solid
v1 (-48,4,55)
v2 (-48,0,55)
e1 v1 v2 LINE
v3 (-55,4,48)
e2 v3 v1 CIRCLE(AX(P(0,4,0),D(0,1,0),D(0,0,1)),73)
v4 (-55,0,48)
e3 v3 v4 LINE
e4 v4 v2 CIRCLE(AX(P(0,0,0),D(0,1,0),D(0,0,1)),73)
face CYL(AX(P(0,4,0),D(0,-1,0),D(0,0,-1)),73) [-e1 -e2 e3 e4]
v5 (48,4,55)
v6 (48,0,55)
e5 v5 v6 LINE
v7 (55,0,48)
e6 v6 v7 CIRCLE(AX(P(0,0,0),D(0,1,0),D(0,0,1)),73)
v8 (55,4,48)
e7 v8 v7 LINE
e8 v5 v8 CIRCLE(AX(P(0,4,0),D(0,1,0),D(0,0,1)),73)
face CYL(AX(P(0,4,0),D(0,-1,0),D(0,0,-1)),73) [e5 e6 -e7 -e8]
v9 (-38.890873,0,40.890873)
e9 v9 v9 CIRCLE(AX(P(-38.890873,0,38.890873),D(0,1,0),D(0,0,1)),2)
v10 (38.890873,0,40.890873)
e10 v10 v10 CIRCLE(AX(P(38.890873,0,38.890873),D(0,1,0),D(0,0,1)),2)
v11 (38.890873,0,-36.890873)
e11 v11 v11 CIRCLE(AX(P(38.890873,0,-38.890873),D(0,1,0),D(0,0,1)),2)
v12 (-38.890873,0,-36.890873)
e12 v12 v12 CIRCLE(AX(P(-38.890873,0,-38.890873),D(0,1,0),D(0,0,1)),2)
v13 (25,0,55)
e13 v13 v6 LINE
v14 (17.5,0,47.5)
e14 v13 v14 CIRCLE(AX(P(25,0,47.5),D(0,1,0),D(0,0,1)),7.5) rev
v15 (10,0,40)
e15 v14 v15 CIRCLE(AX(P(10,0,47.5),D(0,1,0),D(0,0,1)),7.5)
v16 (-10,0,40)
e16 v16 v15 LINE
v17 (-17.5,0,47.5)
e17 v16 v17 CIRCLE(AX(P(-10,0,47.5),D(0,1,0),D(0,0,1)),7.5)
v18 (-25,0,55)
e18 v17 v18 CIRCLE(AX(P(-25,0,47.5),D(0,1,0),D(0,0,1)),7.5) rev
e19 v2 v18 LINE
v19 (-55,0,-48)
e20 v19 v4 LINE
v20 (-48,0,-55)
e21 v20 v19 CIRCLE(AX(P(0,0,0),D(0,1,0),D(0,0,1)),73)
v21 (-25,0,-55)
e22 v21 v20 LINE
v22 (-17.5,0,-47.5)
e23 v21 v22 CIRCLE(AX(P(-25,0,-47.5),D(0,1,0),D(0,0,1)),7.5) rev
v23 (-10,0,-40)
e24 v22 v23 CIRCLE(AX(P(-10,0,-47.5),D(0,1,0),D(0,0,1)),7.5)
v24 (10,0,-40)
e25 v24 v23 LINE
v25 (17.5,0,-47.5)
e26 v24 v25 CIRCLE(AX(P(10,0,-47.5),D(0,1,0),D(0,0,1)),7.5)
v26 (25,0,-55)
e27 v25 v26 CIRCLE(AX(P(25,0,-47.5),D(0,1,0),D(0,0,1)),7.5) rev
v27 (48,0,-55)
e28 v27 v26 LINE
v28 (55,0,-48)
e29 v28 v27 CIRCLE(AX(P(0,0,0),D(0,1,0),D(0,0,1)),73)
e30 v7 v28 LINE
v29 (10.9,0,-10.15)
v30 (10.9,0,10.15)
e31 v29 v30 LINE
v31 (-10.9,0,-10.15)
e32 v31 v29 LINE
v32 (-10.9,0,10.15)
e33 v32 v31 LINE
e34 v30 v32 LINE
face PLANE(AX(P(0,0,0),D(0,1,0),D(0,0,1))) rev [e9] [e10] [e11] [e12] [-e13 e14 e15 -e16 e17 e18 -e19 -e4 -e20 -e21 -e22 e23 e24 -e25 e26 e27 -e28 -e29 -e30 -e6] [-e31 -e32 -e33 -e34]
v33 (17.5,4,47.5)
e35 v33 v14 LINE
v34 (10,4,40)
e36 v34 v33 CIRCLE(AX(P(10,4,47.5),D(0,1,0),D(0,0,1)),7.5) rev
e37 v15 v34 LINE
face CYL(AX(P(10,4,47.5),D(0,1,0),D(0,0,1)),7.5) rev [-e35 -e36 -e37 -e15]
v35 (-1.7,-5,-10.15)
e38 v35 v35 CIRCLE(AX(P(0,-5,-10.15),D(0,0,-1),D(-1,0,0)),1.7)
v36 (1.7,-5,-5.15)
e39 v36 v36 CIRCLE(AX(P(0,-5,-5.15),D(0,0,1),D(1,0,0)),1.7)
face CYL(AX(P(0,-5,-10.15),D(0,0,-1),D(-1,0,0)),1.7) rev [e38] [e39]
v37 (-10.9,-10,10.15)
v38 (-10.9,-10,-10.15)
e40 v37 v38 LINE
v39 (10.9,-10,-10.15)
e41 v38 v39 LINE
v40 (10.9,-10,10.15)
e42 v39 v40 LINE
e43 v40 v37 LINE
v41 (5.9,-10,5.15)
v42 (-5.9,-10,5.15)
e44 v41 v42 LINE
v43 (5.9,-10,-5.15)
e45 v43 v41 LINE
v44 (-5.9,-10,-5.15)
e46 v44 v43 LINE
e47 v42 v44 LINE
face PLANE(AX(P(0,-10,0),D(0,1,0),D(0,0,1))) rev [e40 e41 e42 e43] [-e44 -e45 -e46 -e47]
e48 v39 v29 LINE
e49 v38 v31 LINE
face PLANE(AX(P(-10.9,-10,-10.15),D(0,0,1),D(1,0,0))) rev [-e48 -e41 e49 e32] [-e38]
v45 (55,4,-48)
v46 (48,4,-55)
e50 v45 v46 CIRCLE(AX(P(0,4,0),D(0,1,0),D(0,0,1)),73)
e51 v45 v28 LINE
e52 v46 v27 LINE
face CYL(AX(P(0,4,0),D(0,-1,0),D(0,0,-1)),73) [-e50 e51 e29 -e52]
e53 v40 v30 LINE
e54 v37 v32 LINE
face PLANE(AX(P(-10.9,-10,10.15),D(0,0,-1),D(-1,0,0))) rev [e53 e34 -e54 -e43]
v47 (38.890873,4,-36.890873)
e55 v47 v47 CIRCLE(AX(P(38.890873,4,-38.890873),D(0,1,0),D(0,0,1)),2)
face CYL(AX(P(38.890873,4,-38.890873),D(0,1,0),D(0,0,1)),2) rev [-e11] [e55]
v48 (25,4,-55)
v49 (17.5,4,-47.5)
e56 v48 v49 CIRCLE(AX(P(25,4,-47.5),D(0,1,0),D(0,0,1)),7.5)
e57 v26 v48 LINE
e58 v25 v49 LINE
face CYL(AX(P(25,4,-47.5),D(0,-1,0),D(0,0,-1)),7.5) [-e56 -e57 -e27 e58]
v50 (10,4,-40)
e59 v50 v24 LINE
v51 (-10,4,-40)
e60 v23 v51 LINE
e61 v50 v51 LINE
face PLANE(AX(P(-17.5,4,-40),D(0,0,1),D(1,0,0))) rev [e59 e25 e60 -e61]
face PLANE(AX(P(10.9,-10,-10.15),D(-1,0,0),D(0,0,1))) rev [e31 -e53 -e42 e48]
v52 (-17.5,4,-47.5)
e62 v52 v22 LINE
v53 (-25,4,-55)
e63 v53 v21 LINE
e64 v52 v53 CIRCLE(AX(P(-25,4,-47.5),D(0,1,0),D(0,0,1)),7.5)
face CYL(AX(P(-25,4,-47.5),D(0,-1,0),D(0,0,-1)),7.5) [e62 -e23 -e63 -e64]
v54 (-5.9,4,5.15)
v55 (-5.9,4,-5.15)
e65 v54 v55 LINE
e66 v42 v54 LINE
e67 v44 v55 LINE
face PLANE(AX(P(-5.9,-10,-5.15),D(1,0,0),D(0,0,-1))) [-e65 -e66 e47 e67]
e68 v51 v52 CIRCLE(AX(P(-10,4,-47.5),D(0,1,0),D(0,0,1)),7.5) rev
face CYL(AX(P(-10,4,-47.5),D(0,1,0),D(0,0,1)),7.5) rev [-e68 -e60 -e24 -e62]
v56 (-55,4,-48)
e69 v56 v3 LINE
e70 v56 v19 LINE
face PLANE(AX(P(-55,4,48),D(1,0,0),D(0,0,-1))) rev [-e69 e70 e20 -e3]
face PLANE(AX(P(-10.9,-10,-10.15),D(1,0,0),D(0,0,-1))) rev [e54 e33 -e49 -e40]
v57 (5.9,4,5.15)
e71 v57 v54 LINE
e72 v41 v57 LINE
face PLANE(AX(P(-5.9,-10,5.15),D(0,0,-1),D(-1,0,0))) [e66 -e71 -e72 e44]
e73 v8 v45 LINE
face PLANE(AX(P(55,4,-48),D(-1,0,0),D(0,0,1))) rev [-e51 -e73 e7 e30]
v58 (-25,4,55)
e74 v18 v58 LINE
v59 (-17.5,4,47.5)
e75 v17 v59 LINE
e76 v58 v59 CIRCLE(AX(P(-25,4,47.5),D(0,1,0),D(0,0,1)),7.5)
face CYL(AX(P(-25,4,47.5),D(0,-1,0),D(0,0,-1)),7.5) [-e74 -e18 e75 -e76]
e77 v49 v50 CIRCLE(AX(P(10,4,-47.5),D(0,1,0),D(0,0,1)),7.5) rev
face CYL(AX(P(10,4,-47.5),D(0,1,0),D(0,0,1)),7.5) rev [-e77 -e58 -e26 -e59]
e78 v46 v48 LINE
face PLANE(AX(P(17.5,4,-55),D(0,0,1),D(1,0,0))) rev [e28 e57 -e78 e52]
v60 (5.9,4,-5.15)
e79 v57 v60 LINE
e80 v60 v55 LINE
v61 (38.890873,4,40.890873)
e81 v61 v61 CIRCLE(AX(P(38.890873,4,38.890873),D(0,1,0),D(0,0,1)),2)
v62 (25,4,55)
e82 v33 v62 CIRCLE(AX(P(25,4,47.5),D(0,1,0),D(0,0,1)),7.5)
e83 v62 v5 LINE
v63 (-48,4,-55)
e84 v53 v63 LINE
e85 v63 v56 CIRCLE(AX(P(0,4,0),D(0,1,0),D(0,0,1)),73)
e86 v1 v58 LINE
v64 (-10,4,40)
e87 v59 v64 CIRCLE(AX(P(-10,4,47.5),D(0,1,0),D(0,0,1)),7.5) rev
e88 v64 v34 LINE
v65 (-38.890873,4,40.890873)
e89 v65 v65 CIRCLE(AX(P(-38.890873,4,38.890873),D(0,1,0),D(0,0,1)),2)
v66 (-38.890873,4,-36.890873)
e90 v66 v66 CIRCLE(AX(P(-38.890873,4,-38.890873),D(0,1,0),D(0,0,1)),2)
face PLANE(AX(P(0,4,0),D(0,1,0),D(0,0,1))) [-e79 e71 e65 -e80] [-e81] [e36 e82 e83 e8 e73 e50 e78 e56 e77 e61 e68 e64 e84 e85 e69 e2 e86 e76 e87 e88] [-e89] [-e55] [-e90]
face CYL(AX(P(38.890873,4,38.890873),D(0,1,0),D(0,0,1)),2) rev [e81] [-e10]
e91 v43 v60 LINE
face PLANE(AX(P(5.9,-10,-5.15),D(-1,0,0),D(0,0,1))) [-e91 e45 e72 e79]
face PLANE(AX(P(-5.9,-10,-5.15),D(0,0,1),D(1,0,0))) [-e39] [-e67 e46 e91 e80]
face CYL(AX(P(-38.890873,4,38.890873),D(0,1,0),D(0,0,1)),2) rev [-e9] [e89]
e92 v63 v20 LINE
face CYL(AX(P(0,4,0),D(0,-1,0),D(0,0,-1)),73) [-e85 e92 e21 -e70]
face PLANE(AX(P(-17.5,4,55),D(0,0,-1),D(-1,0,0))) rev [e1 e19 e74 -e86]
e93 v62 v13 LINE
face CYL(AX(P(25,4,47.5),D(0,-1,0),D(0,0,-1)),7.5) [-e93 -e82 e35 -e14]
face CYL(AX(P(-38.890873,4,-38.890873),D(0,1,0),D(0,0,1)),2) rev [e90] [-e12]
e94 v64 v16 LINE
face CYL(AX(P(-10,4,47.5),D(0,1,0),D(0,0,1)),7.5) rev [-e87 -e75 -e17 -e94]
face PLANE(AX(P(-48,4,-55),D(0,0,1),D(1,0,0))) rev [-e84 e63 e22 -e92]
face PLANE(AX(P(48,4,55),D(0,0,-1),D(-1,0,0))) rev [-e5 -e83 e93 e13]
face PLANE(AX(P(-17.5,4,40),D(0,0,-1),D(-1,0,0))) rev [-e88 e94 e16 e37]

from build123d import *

# Parameters (mm, degrees)
BOSS_EXTRUDE1_DEPTH      = 4
F_4_0MM_DOWEL_HOLE2_D    = 4
FILLET1_START            = -1
FILLET1_DEPTH            = 6
FILLET1_2_DEPTH          = 4
SKETCH7_W                = 21.8
SKETCH7_H                = 20.3
SKETCH7_W_2              = 11.8
SKETCH7_H_2              = 10.3
BOSS_EXTRUDE2_DEPTH      = 10
M3_CLEARANCE_HOLE1_D     = 3.4
M3_CLEARANCE_HOLE1_DEPTH = 5
SKETCH7_2_W              = 11.8
SKETCH7_2_H              = 10.3
CUT_EXTRUDE1_DEPTH       = 10


with BuildPart() as part:
    # Sketch1 → Boss-Extrude1 (new body)
    with BuildSketch(Plane(origin=(0, 0, 0), x_dir=(1, 0, 0), z_dir=(0, 1, 0))):
        with BuildLine():
            Line((55, 48), (55, -48))
            ThreePointArc((55, -48), (51.618795027, -51.618795027), (48, -55))
            Line((48, -55), (17.5, -55))
            Line((17.5, -55), (17.5, -40))
            Line((17.5, -40), (-17.5, -40))
            Line((-17.5, -40), (-17.5, -55))
            Line((-17.5, -55), (-48, -55))
            ThreePointArc((-48, -55), (-51.618795027, -51.618795027), (-55, -48))
            Line((-55, -48), (-55, 48))
            ThreePointArc((-55, 48), (-51.618795027, 51.618795027), (-48, 55))
            Line((-48, 55), (-17.5, 55))
            Line((-17.5, 55), (-17.5, 40))
            Line((-17.5, 40), (17.5, 40))
            Line((17.5, 40), (17.5, 55))
            Line((17.5, 55), (48, 55))
            ThreePointArc((48, 55), (51.618795027, 51.618795027), (55, 48))
        make_face()
    extrude(amount=BOSS_EXTRUDE1_DEPTH)

    # Ø4.0mm Dowel Hole2 (through all)
    with Locations(Plane(origin=(0, 4, 0), x_dir=(1, 0, 0), z_dir=(0, 1, 0))):
        with Locations((38.890872965, 38.890872965), (38.890872965, -38.890872965), (-38.890872965, -38.890872965), (-38.890872965, 38.890872965)):
            Hole(F_4_0MM_DOWEL_HOLE2_D / 2)

    # Fillet1: read off the stored shape, not the designer's step
    # Fillet1 outline → Fillet1 (cut)
    with BuildSketch(Plane(origin=(0, 0, 0), x_dir=(1, 0, 0), z_dir=(0, 1, 0)).offset(FILLET1_START)):
        with BuildLine():
            Line((17.5, 55), (17.5, 47.5))
            ThreePointArc((17.5, 47.5), (19.696699141, 52.803300859), (25, 55))
            Line((25, 55), (17.5, 55))
        make_face()
        with BuildLine():
            ThreePointArc((-25, 55), (-19.696699141, 52.803300859), (-17.5, 47.5))
            Line((-17.5, 47.5), (-17.5, 55))
            Line((-17.5, 55), (-25, 55))
        make_face()
        with BuildLine():
            Line((-17.5, -55), (-17.5, -47.5))
            ThreePointArc((-17.5, -47.5), (-19.696699141, -52.803300859), (-25, -55))
            Line((-25, -55), (-17.5, -55))
        make_face()
        with BuildLine():
            ThreePointArc((25, -55), (19.696699141, -52.803300859), (17.5, -47.5))
            Line((17.5, -47.5), (17.5, -55))
            Line((17.5, -55), (25, -55))
        make_face()
    extrude(amount=FILLET1_DEPTH, mode=Mode.SUBTRACT)

    # Fillet1 2 outline → Fillet1 2 (add)
    with BuildSketch(Plane(origin=(0, 0, 0), x_dir=(1, 0, 0), z_dir=(0, 1, 0))):
        with BuildLine():
            Line((-17.5, 40), (-10, 40))
            ThreePointArc((-10, 40), (-15.303300859, 42.196699141), (-17.5, 47.5))
            Line((-17.5, 47.5), (-17.5, 40))
        make_face()
        with BuildLine():
            ThreePointArc((17.5, 47.5), (15.303300859, 42.196699141), (10, 40))
            Line((10, 40), (17.5, 40))
            Line((17.5, 40), (17.5, 47.5))
        make_face()
        with BuildLine():
            Line((17.5, -40), (10, -40))
            ThreePointArc((10, -40), (15.303300859, -42.196699141), (17.5, -47.5))
            Line((17.5, -47.5), (17.5, -40))
        make_face()
        with BuildLine():
            ThreePointArc((-17.5, -47.5), (-15.303300859, -42.196699141), (-10, -40))
            Line((-10, -40), (-17.5, -40))
            Line((-17.5, -40), (-17.5, -47.5))
        make_face()
    extrude(amount=FILLET1_2_DEPTH)

    # Sketch7 → Boss-Extrude2 (add)
    with BuildSketch(Plane.XZ):
        Rectangle(SKETCH7_W, SKETCH7_H)
        Rectangle(SKETCH7_W_2, SKETCH7_H_2, mode=Mode.SUBTRACT)
    extrude(amount=BOSS_EXTRUDE2_DEPTH)

    # M3 Clearance Hole1
    with Locations(Plane(origin=(0, -5, -10.15), x_dir=(-1, 0, 0), z_dir=(0, 0, -1))):
        with Locations((0, 0)):
            Hole(M3_CLEARANCE_HOLE1_D / 2, depth=M3_CLEARANCE_HOLE1_DEPTH)

    # Sketch7<2> → Cut-Extrude1 (cut)
    with BuildSketch(Plane.XZ):
        Rectangle(SKETCH7_2_W, SKETCH7_2_H)
    extrude(amount=-CUT_EXTRUDE1_DEPTH, mode=Mode.SUBTRACT)


solid = part.part
